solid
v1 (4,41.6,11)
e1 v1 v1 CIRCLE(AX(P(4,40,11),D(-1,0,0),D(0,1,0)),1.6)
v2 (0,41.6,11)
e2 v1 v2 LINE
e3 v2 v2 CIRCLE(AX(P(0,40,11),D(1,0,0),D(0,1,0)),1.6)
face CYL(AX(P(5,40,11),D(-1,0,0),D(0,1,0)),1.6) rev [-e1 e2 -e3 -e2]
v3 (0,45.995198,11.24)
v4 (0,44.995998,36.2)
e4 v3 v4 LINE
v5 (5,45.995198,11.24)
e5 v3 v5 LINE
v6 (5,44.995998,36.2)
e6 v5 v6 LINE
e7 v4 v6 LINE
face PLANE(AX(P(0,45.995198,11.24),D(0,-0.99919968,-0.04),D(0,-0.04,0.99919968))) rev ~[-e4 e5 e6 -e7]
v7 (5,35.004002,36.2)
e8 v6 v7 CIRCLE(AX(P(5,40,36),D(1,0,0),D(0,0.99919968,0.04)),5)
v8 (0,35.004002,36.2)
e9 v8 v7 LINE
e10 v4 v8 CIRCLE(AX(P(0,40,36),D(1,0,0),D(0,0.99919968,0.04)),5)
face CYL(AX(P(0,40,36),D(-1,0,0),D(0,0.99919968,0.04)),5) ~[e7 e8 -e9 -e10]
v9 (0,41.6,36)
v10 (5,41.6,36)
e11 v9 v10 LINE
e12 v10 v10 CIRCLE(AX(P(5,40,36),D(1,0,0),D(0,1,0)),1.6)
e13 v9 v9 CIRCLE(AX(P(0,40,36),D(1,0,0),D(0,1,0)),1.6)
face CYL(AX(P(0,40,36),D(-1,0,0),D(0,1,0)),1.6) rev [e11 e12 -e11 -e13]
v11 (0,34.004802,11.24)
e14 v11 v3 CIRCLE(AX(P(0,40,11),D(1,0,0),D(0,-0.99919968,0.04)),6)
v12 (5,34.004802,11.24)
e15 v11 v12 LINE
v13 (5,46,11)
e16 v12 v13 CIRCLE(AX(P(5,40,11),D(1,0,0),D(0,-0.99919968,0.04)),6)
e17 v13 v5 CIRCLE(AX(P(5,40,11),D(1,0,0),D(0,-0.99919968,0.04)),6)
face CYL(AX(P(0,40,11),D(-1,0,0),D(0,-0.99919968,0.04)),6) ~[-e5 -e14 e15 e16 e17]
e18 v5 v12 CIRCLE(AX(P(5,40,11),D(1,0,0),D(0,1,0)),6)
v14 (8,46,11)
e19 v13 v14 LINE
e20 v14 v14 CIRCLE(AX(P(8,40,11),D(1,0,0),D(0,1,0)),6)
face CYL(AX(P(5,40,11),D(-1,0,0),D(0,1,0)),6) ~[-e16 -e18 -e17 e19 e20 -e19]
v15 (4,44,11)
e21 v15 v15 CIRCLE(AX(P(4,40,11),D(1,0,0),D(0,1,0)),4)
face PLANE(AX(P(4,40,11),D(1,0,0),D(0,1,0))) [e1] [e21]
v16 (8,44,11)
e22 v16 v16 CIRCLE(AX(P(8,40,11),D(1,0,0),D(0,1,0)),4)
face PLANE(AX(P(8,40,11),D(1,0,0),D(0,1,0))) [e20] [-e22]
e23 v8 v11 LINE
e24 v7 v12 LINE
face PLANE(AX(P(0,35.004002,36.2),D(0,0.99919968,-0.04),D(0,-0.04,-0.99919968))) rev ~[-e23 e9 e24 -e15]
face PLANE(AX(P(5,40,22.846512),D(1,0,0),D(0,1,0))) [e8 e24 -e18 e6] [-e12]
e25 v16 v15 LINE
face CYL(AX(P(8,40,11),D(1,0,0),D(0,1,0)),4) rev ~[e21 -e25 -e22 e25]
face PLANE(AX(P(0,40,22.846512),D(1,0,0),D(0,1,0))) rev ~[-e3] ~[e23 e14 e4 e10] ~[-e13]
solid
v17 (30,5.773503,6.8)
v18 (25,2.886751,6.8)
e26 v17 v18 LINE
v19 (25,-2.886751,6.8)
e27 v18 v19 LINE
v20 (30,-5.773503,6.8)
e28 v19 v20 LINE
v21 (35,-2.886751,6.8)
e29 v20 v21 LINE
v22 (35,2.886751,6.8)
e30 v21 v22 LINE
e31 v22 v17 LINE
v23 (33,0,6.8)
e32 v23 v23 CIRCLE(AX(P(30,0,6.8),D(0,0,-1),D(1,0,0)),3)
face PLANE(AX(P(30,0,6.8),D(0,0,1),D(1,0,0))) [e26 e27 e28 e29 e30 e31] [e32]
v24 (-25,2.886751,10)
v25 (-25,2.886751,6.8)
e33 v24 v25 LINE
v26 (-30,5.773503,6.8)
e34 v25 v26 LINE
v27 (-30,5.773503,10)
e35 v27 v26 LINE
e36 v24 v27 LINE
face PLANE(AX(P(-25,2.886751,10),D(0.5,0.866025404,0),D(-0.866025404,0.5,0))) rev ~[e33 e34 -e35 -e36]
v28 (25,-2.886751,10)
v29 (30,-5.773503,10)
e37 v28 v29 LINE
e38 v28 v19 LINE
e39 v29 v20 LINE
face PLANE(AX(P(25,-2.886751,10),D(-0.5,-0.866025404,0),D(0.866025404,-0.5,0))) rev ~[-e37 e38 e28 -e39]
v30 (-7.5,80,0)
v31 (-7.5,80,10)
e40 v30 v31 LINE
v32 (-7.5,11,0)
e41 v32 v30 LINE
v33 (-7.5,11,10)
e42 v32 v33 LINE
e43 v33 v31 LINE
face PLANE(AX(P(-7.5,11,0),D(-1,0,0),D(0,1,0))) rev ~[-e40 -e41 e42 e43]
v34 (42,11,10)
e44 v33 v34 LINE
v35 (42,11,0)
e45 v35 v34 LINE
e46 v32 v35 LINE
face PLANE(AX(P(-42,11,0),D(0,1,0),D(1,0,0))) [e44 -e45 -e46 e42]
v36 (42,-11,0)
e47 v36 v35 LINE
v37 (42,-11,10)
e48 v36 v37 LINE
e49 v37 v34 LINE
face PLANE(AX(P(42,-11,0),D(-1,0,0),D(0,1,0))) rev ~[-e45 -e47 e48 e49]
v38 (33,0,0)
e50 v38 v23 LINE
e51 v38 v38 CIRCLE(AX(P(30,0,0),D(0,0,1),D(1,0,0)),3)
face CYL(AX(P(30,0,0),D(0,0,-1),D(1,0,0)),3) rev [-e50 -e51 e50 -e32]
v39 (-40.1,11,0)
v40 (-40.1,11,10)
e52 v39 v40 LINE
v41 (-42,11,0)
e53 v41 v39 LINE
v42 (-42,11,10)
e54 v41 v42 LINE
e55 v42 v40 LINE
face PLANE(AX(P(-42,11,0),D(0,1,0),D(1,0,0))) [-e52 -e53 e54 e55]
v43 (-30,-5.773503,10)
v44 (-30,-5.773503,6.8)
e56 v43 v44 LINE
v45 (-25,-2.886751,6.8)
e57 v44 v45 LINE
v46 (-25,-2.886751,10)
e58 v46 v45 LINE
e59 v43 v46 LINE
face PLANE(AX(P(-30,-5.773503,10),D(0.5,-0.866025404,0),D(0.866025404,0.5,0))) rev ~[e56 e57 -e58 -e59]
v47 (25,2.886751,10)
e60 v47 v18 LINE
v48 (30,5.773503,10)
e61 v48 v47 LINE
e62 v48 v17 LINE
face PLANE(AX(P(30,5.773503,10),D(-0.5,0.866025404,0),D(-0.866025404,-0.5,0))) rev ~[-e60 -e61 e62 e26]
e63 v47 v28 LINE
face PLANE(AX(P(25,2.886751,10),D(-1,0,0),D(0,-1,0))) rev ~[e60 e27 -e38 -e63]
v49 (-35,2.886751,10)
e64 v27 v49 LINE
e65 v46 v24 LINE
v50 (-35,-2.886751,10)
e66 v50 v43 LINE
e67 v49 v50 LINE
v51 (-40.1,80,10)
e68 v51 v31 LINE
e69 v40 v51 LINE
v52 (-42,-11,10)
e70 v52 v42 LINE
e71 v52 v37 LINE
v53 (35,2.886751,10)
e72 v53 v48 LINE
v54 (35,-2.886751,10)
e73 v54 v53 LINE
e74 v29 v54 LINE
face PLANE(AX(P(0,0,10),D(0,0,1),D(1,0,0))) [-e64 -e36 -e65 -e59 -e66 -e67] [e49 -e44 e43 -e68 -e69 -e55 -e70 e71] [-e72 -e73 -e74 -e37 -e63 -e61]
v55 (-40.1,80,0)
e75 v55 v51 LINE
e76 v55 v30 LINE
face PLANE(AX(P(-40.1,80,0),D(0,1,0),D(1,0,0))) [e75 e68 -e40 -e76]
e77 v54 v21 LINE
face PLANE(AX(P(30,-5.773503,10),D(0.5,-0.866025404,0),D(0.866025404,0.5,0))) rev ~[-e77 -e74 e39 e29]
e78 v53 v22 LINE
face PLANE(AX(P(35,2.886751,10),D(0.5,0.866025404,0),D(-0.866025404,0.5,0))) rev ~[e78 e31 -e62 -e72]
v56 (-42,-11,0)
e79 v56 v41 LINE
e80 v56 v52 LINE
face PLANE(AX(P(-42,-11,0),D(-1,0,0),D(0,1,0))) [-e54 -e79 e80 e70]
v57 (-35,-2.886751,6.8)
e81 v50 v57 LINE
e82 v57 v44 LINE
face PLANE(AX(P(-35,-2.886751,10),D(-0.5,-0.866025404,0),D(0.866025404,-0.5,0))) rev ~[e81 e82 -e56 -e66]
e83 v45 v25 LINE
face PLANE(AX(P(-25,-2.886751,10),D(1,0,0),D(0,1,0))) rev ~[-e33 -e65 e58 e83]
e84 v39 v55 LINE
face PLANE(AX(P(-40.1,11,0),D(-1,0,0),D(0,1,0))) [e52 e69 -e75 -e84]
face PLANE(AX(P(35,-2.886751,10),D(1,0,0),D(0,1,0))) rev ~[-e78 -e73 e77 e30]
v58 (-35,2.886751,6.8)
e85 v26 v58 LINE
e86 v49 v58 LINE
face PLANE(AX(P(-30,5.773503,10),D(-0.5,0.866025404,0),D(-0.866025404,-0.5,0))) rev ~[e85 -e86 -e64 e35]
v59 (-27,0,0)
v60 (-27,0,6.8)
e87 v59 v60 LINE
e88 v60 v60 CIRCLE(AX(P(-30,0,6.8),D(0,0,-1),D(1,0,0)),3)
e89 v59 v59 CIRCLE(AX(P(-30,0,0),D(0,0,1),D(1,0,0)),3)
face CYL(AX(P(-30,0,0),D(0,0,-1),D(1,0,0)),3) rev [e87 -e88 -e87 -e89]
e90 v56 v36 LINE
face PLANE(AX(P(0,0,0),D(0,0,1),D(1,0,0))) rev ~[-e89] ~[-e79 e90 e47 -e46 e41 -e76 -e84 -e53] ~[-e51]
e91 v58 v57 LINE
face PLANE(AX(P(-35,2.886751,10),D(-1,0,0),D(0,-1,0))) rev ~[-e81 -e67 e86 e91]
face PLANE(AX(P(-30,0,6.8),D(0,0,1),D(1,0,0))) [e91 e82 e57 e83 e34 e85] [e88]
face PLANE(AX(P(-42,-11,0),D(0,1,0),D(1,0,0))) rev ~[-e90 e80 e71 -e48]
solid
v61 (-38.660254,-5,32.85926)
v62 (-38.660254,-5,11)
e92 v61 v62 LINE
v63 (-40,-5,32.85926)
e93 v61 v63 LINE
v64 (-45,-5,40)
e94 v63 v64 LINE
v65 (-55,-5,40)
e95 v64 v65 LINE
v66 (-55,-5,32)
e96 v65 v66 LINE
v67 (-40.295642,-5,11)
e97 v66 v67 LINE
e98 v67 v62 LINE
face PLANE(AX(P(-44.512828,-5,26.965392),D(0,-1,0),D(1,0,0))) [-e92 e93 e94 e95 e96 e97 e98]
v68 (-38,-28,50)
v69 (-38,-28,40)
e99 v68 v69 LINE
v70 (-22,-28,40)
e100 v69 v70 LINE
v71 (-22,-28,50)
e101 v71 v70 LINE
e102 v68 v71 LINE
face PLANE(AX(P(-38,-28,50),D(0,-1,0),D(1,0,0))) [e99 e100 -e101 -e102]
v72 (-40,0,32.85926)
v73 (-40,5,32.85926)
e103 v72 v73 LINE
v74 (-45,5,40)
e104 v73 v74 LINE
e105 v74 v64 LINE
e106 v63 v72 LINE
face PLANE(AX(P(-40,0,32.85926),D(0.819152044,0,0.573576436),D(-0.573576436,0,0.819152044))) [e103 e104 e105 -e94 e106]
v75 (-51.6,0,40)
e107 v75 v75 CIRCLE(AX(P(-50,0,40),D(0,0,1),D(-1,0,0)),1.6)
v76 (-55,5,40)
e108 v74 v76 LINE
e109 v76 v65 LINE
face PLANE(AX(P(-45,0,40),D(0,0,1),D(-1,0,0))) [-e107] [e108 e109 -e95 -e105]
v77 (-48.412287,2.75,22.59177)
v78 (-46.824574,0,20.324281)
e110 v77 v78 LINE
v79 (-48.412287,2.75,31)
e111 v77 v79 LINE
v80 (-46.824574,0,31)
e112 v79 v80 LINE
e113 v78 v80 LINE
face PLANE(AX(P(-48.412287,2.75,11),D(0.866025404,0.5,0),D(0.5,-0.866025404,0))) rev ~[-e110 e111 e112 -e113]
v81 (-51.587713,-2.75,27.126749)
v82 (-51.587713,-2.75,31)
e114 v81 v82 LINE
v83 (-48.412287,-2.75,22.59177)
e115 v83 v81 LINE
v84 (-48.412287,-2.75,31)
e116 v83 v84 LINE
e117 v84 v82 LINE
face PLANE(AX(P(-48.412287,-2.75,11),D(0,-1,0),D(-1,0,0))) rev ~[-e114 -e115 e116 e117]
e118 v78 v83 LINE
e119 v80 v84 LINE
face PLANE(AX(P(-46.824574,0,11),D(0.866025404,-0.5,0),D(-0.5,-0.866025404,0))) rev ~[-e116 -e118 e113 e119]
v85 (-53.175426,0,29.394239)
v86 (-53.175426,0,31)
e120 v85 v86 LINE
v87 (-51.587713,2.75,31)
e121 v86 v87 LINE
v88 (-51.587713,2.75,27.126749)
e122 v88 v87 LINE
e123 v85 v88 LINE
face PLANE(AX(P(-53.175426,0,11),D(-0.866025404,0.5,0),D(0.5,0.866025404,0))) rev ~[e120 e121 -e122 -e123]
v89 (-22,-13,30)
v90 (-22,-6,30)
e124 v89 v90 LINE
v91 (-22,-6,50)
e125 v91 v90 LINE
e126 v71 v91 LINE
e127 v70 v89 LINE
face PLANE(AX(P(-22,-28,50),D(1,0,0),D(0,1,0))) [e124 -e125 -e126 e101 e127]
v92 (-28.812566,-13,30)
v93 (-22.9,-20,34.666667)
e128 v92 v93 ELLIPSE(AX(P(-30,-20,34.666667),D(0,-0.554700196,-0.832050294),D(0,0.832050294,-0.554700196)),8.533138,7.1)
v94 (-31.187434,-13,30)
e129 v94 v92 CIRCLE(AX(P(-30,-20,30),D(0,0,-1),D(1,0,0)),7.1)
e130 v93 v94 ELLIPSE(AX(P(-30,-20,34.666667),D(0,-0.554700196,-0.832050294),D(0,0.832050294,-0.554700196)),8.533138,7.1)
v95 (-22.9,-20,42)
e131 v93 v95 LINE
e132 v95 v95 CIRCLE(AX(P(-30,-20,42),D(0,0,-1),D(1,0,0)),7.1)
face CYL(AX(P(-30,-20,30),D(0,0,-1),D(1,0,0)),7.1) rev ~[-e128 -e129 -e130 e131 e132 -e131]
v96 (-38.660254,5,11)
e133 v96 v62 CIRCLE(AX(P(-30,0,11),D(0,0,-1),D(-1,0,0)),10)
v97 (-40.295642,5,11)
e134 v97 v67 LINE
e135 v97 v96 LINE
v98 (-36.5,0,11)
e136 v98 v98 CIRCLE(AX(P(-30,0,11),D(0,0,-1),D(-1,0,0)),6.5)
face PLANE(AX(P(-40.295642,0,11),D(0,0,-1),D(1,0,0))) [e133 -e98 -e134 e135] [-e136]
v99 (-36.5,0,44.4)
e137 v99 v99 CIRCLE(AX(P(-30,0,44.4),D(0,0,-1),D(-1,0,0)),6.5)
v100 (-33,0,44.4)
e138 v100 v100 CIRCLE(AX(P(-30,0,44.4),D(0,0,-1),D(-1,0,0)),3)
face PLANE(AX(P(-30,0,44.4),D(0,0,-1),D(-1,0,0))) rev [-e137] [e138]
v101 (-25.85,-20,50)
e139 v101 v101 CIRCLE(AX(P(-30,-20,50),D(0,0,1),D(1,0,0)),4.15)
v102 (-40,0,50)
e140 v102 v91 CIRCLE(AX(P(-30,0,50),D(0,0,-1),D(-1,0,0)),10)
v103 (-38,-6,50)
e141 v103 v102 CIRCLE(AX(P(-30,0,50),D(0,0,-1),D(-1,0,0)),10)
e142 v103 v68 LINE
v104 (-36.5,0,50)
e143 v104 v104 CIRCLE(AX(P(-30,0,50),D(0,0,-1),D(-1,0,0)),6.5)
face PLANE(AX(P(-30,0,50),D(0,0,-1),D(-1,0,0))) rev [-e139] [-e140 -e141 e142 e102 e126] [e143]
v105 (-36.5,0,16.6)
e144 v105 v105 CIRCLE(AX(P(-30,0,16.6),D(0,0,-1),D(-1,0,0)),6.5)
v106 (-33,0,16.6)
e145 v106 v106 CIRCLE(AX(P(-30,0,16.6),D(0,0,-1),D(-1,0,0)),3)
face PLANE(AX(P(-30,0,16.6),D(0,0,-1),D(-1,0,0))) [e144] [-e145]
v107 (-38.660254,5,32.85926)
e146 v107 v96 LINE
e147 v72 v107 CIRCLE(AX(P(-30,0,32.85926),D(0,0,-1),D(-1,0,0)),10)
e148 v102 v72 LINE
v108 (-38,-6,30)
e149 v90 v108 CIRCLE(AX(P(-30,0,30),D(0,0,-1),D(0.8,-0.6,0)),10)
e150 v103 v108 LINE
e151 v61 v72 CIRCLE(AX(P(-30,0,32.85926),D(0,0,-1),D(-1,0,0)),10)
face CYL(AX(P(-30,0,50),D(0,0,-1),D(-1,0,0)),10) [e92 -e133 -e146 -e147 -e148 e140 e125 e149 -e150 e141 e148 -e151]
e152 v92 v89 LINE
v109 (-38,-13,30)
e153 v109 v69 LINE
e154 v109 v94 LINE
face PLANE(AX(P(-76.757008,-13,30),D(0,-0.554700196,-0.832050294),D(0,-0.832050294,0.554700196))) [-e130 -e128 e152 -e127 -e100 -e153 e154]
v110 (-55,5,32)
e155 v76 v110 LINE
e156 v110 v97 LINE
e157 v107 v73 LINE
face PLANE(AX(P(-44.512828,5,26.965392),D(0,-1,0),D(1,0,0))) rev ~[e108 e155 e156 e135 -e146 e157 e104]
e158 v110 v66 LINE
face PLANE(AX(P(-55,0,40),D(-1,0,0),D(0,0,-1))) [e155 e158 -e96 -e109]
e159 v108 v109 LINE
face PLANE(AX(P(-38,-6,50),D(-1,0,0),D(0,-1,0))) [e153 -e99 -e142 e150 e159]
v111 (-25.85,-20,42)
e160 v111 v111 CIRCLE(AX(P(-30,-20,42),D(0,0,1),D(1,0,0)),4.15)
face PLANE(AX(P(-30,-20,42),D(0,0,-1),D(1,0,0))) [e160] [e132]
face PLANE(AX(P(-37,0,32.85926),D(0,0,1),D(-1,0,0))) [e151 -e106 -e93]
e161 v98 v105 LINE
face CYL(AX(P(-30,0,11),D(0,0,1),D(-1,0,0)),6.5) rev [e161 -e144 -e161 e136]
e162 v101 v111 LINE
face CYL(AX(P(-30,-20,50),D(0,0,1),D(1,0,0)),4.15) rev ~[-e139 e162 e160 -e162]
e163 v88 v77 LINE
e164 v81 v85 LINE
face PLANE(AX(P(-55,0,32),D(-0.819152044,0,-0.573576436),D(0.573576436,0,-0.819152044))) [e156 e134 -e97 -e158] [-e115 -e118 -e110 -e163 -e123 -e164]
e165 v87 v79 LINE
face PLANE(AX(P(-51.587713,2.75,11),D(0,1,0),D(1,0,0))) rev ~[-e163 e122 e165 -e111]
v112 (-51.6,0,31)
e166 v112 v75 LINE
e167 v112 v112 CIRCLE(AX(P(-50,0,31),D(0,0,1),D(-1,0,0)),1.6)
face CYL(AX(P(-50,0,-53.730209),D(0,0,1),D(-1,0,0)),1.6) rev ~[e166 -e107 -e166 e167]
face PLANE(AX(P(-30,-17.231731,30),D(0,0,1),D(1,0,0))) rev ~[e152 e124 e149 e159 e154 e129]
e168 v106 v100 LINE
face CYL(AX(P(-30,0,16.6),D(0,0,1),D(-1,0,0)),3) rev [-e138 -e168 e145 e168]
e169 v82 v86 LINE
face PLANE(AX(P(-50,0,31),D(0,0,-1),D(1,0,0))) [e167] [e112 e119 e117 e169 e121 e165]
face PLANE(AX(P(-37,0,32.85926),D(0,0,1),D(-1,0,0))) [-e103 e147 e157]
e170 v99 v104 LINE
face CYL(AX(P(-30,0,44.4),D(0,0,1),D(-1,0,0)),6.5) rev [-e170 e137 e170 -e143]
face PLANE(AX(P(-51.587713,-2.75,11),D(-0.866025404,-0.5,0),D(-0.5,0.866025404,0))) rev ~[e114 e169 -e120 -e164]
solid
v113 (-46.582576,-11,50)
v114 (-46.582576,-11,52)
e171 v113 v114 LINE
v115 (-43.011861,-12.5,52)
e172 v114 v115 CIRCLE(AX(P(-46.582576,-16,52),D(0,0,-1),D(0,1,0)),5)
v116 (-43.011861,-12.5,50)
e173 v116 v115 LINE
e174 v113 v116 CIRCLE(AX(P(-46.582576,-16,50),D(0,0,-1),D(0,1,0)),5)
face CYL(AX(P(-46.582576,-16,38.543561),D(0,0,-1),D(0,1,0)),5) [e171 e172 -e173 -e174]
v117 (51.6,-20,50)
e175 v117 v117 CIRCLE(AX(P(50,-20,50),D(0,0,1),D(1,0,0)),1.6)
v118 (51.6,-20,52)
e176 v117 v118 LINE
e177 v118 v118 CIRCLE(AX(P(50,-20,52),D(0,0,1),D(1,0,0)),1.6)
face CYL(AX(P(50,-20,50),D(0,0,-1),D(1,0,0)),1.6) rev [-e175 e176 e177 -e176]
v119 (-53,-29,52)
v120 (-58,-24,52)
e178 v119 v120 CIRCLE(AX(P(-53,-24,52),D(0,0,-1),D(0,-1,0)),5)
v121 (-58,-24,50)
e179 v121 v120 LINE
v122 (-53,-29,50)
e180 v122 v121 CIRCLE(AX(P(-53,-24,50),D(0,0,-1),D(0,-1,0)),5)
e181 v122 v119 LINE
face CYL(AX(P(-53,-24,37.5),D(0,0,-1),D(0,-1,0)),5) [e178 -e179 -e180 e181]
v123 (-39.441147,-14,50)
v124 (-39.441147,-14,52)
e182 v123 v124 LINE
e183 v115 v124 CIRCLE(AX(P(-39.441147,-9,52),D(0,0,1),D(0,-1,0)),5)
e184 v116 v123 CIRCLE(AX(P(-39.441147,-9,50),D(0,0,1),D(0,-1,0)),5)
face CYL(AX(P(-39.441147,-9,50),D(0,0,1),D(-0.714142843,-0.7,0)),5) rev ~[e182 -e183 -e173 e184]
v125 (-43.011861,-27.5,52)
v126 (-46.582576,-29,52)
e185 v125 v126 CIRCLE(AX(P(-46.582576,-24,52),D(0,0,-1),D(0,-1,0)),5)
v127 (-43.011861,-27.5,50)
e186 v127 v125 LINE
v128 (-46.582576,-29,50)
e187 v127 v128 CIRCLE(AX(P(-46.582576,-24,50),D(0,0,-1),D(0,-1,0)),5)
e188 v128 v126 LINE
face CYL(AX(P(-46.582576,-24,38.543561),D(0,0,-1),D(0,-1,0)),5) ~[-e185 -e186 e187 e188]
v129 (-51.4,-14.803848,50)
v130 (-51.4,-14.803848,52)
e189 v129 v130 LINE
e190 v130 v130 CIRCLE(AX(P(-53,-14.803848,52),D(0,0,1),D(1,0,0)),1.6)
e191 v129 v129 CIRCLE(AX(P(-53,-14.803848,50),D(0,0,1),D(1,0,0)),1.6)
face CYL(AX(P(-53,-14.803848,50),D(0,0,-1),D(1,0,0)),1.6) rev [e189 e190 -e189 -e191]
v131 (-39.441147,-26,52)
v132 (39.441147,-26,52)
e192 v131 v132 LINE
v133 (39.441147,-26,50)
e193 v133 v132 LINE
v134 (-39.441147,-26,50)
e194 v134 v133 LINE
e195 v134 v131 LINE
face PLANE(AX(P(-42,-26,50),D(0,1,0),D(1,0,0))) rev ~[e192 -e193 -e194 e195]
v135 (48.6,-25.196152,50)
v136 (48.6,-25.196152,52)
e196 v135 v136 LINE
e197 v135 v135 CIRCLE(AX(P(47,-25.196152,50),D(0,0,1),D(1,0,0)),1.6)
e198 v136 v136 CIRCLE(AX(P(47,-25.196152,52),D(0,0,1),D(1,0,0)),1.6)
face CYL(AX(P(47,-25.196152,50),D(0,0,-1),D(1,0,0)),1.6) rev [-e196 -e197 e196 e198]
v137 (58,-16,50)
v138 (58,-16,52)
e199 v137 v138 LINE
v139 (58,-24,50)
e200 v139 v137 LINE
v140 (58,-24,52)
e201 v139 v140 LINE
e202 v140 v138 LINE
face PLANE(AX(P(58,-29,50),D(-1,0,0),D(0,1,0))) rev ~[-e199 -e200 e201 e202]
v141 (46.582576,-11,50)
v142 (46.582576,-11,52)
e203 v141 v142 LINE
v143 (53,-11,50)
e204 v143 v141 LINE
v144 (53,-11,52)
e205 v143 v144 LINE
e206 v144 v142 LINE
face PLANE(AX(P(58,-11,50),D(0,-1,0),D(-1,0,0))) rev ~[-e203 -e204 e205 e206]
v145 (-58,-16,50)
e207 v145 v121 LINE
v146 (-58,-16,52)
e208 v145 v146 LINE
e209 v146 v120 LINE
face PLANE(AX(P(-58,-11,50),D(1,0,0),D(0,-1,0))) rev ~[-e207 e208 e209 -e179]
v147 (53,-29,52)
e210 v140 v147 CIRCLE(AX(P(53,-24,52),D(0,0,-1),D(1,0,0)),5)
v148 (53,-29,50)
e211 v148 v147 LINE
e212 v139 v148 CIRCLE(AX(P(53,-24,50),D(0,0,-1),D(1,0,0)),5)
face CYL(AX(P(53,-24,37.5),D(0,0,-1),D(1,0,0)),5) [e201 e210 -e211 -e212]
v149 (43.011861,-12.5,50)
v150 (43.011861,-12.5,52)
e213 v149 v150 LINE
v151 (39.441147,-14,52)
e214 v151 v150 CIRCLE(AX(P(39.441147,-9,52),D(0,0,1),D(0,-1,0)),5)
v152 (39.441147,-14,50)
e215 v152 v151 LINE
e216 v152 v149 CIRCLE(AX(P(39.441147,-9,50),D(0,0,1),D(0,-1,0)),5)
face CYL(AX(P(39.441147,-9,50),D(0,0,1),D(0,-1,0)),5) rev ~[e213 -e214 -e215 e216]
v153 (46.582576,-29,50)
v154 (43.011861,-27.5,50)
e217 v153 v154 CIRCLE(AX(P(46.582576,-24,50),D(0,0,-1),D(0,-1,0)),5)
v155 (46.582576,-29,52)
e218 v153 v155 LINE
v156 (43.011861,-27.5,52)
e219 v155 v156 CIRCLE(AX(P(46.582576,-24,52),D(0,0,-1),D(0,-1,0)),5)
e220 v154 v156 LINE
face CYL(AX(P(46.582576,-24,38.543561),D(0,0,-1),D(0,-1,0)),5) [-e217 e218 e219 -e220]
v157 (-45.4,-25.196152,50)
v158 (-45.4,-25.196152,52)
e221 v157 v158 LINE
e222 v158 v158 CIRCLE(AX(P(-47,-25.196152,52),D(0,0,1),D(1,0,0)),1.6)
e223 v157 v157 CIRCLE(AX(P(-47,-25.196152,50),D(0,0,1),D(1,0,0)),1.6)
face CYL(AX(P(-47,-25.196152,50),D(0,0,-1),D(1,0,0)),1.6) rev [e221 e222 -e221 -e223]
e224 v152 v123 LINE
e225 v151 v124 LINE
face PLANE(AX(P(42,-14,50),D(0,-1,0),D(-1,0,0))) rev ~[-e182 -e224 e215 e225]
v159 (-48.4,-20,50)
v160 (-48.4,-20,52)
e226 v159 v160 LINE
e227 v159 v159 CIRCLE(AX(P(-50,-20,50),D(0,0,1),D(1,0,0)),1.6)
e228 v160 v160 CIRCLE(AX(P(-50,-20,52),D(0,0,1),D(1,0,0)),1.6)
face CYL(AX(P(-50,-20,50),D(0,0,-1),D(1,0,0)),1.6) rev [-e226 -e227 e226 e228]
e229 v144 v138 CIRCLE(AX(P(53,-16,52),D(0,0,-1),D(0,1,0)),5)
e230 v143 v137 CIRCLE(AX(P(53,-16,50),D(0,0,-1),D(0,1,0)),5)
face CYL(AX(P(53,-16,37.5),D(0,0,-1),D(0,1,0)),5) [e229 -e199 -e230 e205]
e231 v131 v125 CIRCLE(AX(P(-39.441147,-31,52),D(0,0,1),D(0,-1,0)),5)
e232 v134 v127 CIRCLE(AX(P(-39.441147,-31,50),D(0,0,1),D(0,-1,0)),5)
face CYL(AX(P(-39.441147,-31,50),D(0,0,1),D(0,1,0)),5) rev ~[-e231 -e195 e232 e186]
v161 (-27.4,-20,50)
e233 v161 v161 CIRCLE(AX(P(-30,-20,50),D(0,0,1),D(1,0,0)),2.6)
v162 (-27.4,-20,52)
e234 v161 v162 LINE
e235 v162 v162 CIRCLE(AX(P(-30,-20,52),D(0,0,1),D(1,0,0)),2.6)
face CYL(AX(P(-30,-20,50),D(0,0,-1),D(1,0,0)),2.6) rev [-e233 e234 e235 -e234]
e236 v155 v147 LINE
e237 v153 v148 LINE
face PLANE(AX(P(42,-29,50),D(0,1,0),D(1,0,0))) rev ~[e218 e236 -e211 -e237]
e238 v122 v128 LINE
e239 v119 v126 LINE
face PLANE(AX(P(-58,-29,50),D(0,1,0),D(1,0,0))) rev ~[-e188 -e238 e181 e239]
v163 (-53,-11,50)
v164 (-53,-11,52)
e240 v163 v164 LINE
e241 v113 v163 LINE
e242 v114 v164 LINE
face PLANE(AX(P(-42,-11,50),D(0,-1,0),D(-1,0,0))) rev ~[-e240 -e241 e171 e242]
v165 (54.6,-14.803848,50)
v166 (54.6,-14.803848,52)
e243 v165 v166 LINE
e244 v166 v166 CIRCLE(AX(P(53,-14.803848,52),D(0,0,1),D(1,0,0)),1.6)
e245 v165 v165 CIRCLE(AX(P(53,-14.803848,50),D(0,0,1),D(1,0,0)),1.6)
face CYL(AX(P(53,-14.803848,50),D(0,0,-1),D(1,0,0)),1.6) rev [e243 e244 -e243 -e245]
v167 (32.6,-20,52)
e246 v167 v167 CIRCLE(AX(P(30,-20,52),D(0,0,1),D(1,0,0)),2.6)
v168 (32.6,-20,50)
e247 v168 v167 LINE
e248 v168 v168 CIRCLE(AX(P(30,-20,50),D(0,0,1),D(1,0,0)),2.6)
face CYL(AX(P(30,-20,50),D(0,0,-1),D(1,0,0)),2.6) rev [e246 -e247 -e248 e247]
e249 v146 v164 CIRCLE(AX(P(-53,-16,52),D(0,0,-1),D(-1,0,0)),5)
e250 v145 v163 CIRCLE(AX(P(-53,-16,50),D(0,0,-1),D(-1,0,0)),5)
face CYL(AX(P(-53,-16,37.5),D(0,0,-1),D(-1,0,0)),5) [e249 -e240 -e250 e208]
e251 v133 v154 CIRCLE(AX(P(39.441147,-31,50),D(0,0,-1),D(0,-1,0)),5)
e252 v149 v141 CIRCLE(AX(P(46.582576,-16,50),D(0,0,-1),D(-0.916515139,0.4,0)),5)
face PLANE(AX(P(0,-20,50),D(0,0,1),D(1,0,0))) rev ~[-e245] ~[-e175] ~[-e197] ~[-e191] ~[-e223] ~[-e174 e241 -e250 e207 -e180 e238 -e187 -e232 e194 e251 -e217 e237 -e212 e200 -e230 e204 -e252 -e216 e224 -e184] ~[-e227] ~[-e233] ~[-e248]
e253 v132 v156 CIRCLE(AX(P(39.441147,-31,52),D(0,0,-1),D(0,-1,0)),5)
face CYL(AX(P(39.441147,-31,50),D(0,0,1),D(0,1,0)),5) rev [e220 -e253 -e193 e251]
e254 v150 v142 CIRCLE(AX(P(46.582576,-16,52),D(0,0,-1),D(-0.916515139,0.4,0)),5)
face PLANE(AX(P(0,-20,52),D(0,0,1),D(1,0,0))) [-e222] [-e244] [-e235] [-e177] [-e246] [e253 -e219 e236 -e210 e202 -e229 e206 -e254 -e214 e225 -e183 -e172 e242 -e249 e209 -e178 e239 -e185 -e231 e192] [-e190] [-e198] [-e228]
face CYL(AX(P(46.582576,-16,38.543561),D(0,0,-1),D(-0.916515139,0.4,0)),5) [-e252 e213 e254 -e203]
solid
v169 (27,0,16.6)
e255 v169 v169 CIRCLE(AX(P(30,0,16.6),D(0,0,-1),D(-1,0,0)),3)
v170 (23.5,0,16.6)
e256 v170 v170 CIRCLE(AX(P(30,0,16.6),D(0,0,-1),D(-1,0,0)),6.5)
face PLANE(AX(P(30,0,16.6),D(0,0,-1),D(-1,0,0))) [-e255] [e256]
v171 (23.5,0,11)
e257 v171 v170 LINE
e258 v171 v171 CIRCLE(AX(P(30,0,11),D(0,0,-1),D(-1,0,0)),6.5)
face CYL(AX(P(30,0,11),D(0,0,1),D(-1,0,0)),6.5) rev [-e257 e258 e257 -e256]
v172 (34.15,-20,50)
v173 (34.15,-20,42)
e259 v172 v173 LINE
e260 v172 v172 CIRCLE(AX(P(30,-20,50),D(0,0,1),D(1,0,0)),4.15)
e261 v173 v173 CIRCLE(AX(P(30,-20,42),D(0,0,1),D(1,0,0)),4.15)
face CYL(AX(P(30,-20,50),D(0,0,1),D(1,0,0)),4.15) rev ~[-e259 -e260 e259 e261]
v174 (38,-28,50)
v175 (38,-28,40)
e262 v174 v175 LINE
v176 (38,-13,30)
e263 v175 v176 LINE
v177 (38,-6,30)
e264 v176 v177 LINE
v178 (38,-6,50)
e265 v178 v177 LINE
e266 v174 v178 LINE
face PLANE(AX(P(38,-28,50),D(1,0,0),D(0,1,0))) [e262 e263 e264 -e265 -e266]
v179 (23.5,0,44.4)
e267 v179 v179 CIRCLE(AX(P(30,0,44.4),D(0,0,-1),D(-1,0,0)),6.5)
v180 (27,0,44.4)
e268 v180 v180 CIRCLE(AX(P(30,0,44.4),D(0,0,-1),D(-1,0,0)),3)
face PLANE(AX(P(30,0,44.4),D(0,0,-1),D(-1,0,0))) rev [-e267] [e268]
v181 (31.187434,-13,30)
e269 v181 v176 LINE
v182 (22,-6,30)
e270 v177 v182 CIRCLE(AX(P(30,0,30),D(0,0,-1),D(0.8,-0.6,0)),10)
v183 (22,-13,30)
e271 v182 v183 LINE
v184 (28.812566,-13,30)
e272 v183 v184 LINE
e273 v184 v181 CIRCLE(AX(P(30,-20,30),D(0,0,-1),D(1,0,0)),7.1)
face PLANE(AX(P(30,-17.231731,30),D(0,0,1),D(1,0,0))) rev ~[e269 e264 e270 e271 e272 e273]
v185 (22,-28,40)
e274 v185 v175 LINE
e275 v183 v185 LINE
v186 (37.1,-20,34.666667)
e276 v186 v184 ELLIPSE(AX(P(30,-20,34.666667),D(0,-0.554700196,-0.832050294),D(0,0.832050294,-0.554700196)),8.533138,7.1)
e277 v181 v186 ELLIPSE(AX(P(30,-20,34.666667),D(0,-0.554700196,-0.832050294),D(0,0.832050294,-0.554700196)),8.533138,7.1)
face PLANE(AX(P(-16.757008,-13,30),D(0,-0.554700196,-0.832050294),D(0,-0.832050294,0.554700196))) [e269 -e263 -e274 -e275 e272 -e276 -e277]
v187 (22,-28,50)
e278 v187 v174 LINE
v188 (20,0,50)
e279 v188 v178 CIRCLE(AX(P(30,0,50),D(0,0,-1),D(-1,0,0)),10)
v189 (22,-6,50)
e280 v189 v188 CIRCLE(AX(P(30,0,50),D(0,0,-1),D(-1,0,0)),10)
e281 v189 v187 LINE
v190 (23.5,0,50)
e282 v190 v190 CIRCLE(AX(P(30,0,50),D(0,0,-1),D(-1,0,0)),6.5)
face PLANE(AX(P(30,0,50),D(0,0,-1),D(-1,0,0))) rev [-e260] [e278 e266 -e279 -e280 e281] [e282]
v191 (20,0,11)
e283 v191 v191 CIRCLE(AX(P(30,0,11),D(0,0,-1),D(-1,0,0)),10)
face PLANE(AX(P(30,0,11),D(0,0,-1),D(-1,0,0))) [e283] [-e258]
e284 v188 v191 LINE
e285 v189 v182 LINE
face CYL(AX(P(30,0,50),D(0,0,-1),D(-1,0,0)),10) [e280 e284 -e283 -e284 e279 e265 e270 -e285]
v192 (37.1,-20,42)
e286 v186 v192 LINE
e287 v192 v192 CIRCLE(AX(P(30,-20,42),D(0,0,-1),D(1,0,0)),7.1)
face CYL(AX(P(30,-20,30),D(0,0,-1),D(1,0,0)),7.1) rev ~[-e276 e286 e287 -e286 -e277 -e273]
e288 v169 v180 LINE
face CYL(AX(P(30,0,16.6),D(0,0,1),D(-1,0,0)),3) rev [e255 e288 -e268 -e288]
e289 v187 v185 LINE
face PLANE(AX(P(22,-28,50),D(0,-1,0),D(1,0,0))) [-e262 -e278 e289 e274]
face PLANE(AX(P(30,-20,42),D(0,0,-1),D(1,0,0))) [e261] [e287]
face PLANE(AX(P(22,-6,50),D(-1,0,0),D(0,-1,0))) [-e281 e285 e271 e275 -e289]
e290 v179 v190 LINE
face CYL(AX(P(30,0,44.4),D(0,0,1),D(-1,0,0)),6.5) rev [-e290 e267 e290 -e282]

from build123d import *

# Parameters (mm, degrees)
F0_W         = 84
F0_H         = 22
F0_R         = 3
F1_DEPTH     = 10
F3_DEPTH     = 3.2
F6_R         = 4.15
F7_DEPTH     = 20
F8_T1_DEPTH  = 93.5140157162
F9_R         = 7.1
F10_DEPTH    = 12
F12_R        = 1.6
F12_R_2      = 2.6
F13_DEPTH    = 2
F14_T1_DEPTH = 27
F14_T3_DEPTH = 24.9128784748
F15_R        = 5
F17_DEPTH    = 5
F18_R        = 1.6
F19_DEPTH    = 5
F20_R        = 6
F20_R_2      = 1.6
F21_DEPTH    = 3
F22_R        = 4
F23_DEPTH    = 4
F25_DEPTH    = 20
F26_D        = 3.2
F28_W        = 32.6
F28_H        = 69
F29_DEPTH    = 10


# Not quite as in the source:
# - a fillet or chamfer that OpenCascade refuses, or shapes differently, is made with other operations: its cross-section is extruded or revolved along the edge and cut away or added


with BuildPart() as f1:
    # F0 (on Top) → F1 (new body)
    with BuildSketch(Plane.XY):
        Rectangle(F0_W, F0_H)
        with Locations((-30, 0)):
            Circle(F0_R, mode=Mode.SUBTRACT)
        with Locations((30, 0)):
            Circle(F0_R, mode=Mode.SUBTRACT)
    extrude(amount=F1_DEPTH)

    # F2 (on face) → F3 (cut)
    with BuildSketch(Plane.XY.offset(10)):
        Polygon((-25, -2.8867513459), (-25, 2.8867513459), (-30, 5.7735026919), (-35, 2.8867513459), (-35, -2.8867513459), (-30, -5.7735026919), align=None)
        Polygon((25, 2.8867513459), (25, -2.8867513459), (30, -5.7735026919), (35, -2.8867513459), (35, 2.8867513459), (30, 5.7735026919), align=None)
    extrude(amount=-F3_DEPTH, mode=Mode.SUBTRACT)

    # F28 (on face) → F29 (join)
    with BuildSketch(Plane.XY):
        with Locations((-23.8, 45.5)):
            Rectangle(F28_W, F28_H)
    extrude(amount=F29_DEPTH)


with BuildPart() as f5:
    # F4 (on Front) → F5 (revolve)
    with BuildSketch(Plane.XZ):
        Polygon((-40, 50), (-40, 11), (-36.5, 11), (-36.5, 16.6), (-33, 16.6), (-33, 44.4), (-36.5, 44.4), (-36.5, 50), align=None)
    revolve(axis=Axis((-30, 0, 5.9249366093), (0, 0, -1)))

    # F6 (on face) → F7 (join)
    with BuildSketch(Plane.XY.offset(50)):
        with BuildLine():
            ThreePointArc((-22, -6), (-30, -10), (-38, -6))
            Line((-38, -6), (-38, -28))
            Line((-38, -28), (-22, -28))
            Line((-22, -28), (-22, -6))
        make_face()
        with Locations((-30, -20)):
            Circle(F6_R, mode=Mode.SUBTRACT)
    extrude(amount=-F7_DEPTH)

    # F8: chamfer of 10 x 15 on 1 edges, made by hand

    # F8_s2 → F8_t1 (cut)
    with BuildSketch(Plane.YZ.offset(-76.7570078581)):
        Polygon((-13, 30), (-28, 40), (-28, 30), align=None)
    extrude(amount=F8_T1_DEPTH, mode=Mode.SUBTRACT)

    # F9 (on face) → F10 (cut)
    with BuildSketch(Plane(origin=(0, 0, 30), x_dir=(1, 0, 0), z_dir=(0, 0, -1))):
        with Locations((-30, 20)):
            Circle(F9_R)
    extrude(amount=-F10_DEPTH, mode=Mode.SUBTRACT)


with BuildPart() as f11_1:
    # F11: copy of F5
    add(f5.part.moved(Location((60, 0, 0))))


with BuildPart() as f13:
    # F12 (on face) → F13 (new body)
    with BuildSketch(Plane.XY.offset(50)):
        Polygon((0, -26), (42, -26), (42, -29), (58, -29), (58, -11), (42, -11), (42, -14), (0, -14), (-42, -14), (-42, -11), (-58, -11), (-58, -29), (-42, -29), (-42, -26), align=None)
        with Locations((-47, -25.1961524227)):
            Circle(F12_R, mode=Mode.SUBTRACT)
        with Locations((47, -25.1961524227)):
            Circle(F12_R, mode=Mode.SUBTRACT)
        with Locations((-50, -20)):
            Circle(F12_R, mode=Mode.SUBTRACT)
        with Locations((-30, -20)):
            Circle(F12_R_2, mode=Mode.SUBTRACT)
        with Locations((-53, -14.8038475773)):
            Circle(F12_R, mode=Mode.SUBTRACT)
        with Locations((30, -20)):
            Circle(F12_R_2, mode=Mode.SUBTRACT)
        with Locations((50, -20)):
            Circle(F12_R, mode=Mode.SUBTRACT)
        with Locations((53, -14.8038475773)):
            Circle(F12_R, mode=Mode.SUBTRACT)
    extrude(amount=F13_DEPTH)

    # F14: fillet of radius 5 on 8 edges, made by hand

    # F14_s2 → F14_t1 (cut)
    with BuildSketch(Plane.XY.offset(37.5)):
        with BuildLine():
            ThreePointArc((-53, -29), (-56.5355339059, -27.5355339059), (-58, -24))
            Line((-58, -24), (-58, -29))
            Line((-58, -29), (-53, -29))
        make_face()
        with BuildLine():
            ThreePointArc((-58, -16), (-56.5355339059, -12.4644660941), (-53, -11))
            Line((-53, -11), (-58, -11))
            Line((-58, -11), (-58, -16))
        make_face()
        with BuildLine():
            ThreePointArc((58, -24), (56.5355339059, -27.5355339059), (53, -29))
            Line((53, -29), (58, -29))
            Line((58, -29), (58, -24))
        make_face()
        with BuildLine():
            ThreePointArc((53, -11), (56.5355339059, -12.4644660941), (58, -16))
            Line((58, -16), (58, -11))
            Line((58, -11), (53, -11))
        make_face()
    extrude(amount=F14_T1_DEPTH, mode=Mode.SUBTRACT)

    # F14_s4 → F14_t3 (cut)
    with BuildSketch(Plane.XY.offset(38.5435607626)):
        with BuildLine():
            ThreePointArc((-46.582575695, -29), (-43.8439629074, -28.1833001327), (-42, -26))
            Line((-42, -26), (-42, -29))
            Line((-42, -29), (-46.582575695, -29))
        make_face()
        with BuildLine():
            ThreePointArc((-46.582575695, -11), (-43.8439629074, -11.8166998673), (-42, -14))
            Line((-42, -14), (-42, -11))
            Line((-42, -11), (-46.582575695, -11))
        make_face()
        with BuildLine():
            ThreePointArc((46.582575695, -29), (43.8439629074, -28.1833001327), (42, -26))
            Line((42, -26), (42, -29))
            Line((42, -29), (46.582575695, -29))
        make_face()
        with BuildLine():
            ThreePointArc((42, -14), (43.8439629074, -11.8166998673), (46.582575695, -11))
            Line((46.582575695, -11), (42, -11))
            Line((42, -11), (42, -14))
        make_face()
    extrude(amount=F14_T3_DEPTH, mode=Mode.SUBTRACT)

    # F15
    f15_edges = [f13.edges().sort_by_distance(p)[0] for p in [
        (42, -26, 51),
        (42, -14, 51),
        (-42, -14, 51),
        (-42, -26, 51),
    ]]
    fillet(f15_edges, radius=F15_R)


with BuildPart() as f5_1:
    add(f5.part)

    # F16 (on Front) → F17 (join, symmetric)
    with BuildSketch(Plane.XZ):
        Polygon((-40, 32.8592599663), (-45, 40), (-55, 40), (-55, 32), (-40.2956416976, 11), (-37, 11), (-37, 32.8592599663), align=None)
    extrude(amount=F17_DEPTH, both=True)

    # F24 (on face) → F25 (cut)
    with BuildSketch(Plane(origin=(0, 0, 11), x_dir=(1, 0, 0), z_dir=(0, 0, -1))):
        Polygon((-48.4122867597, -2.75), (-46.8245735195, 0), (-48.4122867597, 2.75), (-51.5877132403, 2.75), (-53.1754264805, 0), (-51.5877132403, -2.75), align=None)
    extrude(amount=-F25_DEPTH, mode=Mode.SUBTRACT)

    # F26 (through all)
    with Locations(Plane(origin=(0, 0, 11), x_dir=(1, 0, 0), z_dir=(0, 0, -1))):
        with Locations((-50, 0)):
            Hole(F26_D / 2)


with BuildPart() as f19:
    # F18 (on Right) → F19 (new body)
    with BuildSketch(Plane.YZ):
        with BuildLine():
            Line((45.9951980785, 11.24), (44.9959983987, 36.2))
            ThreePointArc((44.9959983987, 36.2), (40, 41), (35.0040016013, 36.2))
            Line((35.0040016013, 36.2), (34.0048019215, 11.24))
            ThreePointArc((34.0048019215, 11.24), (40, 5), (45.9951980785, 11.24))
        make_face()
        with Locations((40, 11)):
            Circle(F18_R, mode=Mode.SUBTRACT)
        with Locations((40, 36)):
            Circle(F18_R, mode=Mode.SUBTRACT)
    extrude(amount=F19_DEPTH)

    # F20 (on face) → F21 (join)
    with BuildSketch(Plane.YZ.offset(5)):
        with Locations((40, 11)):
            Circle(F20_R)
        with Locations((40, 11)):
            Circle(F20_R_2, mode=Mode.SUBTRACT)
    extrude(amount=F21_DEPTH)

    # F22 (on face) → F23 (cut)
    with BuildSketch(Plane.YZ.offset(8)):
        with Locations((40, 11)):
            Circle(F22_R)
    extrude(amount=-F23_DEPTH, mode=Mode.SUBTRACT)


solid = Compound([f1.part, f11_1.part, f13.part, f5_1.part, f19.part])
